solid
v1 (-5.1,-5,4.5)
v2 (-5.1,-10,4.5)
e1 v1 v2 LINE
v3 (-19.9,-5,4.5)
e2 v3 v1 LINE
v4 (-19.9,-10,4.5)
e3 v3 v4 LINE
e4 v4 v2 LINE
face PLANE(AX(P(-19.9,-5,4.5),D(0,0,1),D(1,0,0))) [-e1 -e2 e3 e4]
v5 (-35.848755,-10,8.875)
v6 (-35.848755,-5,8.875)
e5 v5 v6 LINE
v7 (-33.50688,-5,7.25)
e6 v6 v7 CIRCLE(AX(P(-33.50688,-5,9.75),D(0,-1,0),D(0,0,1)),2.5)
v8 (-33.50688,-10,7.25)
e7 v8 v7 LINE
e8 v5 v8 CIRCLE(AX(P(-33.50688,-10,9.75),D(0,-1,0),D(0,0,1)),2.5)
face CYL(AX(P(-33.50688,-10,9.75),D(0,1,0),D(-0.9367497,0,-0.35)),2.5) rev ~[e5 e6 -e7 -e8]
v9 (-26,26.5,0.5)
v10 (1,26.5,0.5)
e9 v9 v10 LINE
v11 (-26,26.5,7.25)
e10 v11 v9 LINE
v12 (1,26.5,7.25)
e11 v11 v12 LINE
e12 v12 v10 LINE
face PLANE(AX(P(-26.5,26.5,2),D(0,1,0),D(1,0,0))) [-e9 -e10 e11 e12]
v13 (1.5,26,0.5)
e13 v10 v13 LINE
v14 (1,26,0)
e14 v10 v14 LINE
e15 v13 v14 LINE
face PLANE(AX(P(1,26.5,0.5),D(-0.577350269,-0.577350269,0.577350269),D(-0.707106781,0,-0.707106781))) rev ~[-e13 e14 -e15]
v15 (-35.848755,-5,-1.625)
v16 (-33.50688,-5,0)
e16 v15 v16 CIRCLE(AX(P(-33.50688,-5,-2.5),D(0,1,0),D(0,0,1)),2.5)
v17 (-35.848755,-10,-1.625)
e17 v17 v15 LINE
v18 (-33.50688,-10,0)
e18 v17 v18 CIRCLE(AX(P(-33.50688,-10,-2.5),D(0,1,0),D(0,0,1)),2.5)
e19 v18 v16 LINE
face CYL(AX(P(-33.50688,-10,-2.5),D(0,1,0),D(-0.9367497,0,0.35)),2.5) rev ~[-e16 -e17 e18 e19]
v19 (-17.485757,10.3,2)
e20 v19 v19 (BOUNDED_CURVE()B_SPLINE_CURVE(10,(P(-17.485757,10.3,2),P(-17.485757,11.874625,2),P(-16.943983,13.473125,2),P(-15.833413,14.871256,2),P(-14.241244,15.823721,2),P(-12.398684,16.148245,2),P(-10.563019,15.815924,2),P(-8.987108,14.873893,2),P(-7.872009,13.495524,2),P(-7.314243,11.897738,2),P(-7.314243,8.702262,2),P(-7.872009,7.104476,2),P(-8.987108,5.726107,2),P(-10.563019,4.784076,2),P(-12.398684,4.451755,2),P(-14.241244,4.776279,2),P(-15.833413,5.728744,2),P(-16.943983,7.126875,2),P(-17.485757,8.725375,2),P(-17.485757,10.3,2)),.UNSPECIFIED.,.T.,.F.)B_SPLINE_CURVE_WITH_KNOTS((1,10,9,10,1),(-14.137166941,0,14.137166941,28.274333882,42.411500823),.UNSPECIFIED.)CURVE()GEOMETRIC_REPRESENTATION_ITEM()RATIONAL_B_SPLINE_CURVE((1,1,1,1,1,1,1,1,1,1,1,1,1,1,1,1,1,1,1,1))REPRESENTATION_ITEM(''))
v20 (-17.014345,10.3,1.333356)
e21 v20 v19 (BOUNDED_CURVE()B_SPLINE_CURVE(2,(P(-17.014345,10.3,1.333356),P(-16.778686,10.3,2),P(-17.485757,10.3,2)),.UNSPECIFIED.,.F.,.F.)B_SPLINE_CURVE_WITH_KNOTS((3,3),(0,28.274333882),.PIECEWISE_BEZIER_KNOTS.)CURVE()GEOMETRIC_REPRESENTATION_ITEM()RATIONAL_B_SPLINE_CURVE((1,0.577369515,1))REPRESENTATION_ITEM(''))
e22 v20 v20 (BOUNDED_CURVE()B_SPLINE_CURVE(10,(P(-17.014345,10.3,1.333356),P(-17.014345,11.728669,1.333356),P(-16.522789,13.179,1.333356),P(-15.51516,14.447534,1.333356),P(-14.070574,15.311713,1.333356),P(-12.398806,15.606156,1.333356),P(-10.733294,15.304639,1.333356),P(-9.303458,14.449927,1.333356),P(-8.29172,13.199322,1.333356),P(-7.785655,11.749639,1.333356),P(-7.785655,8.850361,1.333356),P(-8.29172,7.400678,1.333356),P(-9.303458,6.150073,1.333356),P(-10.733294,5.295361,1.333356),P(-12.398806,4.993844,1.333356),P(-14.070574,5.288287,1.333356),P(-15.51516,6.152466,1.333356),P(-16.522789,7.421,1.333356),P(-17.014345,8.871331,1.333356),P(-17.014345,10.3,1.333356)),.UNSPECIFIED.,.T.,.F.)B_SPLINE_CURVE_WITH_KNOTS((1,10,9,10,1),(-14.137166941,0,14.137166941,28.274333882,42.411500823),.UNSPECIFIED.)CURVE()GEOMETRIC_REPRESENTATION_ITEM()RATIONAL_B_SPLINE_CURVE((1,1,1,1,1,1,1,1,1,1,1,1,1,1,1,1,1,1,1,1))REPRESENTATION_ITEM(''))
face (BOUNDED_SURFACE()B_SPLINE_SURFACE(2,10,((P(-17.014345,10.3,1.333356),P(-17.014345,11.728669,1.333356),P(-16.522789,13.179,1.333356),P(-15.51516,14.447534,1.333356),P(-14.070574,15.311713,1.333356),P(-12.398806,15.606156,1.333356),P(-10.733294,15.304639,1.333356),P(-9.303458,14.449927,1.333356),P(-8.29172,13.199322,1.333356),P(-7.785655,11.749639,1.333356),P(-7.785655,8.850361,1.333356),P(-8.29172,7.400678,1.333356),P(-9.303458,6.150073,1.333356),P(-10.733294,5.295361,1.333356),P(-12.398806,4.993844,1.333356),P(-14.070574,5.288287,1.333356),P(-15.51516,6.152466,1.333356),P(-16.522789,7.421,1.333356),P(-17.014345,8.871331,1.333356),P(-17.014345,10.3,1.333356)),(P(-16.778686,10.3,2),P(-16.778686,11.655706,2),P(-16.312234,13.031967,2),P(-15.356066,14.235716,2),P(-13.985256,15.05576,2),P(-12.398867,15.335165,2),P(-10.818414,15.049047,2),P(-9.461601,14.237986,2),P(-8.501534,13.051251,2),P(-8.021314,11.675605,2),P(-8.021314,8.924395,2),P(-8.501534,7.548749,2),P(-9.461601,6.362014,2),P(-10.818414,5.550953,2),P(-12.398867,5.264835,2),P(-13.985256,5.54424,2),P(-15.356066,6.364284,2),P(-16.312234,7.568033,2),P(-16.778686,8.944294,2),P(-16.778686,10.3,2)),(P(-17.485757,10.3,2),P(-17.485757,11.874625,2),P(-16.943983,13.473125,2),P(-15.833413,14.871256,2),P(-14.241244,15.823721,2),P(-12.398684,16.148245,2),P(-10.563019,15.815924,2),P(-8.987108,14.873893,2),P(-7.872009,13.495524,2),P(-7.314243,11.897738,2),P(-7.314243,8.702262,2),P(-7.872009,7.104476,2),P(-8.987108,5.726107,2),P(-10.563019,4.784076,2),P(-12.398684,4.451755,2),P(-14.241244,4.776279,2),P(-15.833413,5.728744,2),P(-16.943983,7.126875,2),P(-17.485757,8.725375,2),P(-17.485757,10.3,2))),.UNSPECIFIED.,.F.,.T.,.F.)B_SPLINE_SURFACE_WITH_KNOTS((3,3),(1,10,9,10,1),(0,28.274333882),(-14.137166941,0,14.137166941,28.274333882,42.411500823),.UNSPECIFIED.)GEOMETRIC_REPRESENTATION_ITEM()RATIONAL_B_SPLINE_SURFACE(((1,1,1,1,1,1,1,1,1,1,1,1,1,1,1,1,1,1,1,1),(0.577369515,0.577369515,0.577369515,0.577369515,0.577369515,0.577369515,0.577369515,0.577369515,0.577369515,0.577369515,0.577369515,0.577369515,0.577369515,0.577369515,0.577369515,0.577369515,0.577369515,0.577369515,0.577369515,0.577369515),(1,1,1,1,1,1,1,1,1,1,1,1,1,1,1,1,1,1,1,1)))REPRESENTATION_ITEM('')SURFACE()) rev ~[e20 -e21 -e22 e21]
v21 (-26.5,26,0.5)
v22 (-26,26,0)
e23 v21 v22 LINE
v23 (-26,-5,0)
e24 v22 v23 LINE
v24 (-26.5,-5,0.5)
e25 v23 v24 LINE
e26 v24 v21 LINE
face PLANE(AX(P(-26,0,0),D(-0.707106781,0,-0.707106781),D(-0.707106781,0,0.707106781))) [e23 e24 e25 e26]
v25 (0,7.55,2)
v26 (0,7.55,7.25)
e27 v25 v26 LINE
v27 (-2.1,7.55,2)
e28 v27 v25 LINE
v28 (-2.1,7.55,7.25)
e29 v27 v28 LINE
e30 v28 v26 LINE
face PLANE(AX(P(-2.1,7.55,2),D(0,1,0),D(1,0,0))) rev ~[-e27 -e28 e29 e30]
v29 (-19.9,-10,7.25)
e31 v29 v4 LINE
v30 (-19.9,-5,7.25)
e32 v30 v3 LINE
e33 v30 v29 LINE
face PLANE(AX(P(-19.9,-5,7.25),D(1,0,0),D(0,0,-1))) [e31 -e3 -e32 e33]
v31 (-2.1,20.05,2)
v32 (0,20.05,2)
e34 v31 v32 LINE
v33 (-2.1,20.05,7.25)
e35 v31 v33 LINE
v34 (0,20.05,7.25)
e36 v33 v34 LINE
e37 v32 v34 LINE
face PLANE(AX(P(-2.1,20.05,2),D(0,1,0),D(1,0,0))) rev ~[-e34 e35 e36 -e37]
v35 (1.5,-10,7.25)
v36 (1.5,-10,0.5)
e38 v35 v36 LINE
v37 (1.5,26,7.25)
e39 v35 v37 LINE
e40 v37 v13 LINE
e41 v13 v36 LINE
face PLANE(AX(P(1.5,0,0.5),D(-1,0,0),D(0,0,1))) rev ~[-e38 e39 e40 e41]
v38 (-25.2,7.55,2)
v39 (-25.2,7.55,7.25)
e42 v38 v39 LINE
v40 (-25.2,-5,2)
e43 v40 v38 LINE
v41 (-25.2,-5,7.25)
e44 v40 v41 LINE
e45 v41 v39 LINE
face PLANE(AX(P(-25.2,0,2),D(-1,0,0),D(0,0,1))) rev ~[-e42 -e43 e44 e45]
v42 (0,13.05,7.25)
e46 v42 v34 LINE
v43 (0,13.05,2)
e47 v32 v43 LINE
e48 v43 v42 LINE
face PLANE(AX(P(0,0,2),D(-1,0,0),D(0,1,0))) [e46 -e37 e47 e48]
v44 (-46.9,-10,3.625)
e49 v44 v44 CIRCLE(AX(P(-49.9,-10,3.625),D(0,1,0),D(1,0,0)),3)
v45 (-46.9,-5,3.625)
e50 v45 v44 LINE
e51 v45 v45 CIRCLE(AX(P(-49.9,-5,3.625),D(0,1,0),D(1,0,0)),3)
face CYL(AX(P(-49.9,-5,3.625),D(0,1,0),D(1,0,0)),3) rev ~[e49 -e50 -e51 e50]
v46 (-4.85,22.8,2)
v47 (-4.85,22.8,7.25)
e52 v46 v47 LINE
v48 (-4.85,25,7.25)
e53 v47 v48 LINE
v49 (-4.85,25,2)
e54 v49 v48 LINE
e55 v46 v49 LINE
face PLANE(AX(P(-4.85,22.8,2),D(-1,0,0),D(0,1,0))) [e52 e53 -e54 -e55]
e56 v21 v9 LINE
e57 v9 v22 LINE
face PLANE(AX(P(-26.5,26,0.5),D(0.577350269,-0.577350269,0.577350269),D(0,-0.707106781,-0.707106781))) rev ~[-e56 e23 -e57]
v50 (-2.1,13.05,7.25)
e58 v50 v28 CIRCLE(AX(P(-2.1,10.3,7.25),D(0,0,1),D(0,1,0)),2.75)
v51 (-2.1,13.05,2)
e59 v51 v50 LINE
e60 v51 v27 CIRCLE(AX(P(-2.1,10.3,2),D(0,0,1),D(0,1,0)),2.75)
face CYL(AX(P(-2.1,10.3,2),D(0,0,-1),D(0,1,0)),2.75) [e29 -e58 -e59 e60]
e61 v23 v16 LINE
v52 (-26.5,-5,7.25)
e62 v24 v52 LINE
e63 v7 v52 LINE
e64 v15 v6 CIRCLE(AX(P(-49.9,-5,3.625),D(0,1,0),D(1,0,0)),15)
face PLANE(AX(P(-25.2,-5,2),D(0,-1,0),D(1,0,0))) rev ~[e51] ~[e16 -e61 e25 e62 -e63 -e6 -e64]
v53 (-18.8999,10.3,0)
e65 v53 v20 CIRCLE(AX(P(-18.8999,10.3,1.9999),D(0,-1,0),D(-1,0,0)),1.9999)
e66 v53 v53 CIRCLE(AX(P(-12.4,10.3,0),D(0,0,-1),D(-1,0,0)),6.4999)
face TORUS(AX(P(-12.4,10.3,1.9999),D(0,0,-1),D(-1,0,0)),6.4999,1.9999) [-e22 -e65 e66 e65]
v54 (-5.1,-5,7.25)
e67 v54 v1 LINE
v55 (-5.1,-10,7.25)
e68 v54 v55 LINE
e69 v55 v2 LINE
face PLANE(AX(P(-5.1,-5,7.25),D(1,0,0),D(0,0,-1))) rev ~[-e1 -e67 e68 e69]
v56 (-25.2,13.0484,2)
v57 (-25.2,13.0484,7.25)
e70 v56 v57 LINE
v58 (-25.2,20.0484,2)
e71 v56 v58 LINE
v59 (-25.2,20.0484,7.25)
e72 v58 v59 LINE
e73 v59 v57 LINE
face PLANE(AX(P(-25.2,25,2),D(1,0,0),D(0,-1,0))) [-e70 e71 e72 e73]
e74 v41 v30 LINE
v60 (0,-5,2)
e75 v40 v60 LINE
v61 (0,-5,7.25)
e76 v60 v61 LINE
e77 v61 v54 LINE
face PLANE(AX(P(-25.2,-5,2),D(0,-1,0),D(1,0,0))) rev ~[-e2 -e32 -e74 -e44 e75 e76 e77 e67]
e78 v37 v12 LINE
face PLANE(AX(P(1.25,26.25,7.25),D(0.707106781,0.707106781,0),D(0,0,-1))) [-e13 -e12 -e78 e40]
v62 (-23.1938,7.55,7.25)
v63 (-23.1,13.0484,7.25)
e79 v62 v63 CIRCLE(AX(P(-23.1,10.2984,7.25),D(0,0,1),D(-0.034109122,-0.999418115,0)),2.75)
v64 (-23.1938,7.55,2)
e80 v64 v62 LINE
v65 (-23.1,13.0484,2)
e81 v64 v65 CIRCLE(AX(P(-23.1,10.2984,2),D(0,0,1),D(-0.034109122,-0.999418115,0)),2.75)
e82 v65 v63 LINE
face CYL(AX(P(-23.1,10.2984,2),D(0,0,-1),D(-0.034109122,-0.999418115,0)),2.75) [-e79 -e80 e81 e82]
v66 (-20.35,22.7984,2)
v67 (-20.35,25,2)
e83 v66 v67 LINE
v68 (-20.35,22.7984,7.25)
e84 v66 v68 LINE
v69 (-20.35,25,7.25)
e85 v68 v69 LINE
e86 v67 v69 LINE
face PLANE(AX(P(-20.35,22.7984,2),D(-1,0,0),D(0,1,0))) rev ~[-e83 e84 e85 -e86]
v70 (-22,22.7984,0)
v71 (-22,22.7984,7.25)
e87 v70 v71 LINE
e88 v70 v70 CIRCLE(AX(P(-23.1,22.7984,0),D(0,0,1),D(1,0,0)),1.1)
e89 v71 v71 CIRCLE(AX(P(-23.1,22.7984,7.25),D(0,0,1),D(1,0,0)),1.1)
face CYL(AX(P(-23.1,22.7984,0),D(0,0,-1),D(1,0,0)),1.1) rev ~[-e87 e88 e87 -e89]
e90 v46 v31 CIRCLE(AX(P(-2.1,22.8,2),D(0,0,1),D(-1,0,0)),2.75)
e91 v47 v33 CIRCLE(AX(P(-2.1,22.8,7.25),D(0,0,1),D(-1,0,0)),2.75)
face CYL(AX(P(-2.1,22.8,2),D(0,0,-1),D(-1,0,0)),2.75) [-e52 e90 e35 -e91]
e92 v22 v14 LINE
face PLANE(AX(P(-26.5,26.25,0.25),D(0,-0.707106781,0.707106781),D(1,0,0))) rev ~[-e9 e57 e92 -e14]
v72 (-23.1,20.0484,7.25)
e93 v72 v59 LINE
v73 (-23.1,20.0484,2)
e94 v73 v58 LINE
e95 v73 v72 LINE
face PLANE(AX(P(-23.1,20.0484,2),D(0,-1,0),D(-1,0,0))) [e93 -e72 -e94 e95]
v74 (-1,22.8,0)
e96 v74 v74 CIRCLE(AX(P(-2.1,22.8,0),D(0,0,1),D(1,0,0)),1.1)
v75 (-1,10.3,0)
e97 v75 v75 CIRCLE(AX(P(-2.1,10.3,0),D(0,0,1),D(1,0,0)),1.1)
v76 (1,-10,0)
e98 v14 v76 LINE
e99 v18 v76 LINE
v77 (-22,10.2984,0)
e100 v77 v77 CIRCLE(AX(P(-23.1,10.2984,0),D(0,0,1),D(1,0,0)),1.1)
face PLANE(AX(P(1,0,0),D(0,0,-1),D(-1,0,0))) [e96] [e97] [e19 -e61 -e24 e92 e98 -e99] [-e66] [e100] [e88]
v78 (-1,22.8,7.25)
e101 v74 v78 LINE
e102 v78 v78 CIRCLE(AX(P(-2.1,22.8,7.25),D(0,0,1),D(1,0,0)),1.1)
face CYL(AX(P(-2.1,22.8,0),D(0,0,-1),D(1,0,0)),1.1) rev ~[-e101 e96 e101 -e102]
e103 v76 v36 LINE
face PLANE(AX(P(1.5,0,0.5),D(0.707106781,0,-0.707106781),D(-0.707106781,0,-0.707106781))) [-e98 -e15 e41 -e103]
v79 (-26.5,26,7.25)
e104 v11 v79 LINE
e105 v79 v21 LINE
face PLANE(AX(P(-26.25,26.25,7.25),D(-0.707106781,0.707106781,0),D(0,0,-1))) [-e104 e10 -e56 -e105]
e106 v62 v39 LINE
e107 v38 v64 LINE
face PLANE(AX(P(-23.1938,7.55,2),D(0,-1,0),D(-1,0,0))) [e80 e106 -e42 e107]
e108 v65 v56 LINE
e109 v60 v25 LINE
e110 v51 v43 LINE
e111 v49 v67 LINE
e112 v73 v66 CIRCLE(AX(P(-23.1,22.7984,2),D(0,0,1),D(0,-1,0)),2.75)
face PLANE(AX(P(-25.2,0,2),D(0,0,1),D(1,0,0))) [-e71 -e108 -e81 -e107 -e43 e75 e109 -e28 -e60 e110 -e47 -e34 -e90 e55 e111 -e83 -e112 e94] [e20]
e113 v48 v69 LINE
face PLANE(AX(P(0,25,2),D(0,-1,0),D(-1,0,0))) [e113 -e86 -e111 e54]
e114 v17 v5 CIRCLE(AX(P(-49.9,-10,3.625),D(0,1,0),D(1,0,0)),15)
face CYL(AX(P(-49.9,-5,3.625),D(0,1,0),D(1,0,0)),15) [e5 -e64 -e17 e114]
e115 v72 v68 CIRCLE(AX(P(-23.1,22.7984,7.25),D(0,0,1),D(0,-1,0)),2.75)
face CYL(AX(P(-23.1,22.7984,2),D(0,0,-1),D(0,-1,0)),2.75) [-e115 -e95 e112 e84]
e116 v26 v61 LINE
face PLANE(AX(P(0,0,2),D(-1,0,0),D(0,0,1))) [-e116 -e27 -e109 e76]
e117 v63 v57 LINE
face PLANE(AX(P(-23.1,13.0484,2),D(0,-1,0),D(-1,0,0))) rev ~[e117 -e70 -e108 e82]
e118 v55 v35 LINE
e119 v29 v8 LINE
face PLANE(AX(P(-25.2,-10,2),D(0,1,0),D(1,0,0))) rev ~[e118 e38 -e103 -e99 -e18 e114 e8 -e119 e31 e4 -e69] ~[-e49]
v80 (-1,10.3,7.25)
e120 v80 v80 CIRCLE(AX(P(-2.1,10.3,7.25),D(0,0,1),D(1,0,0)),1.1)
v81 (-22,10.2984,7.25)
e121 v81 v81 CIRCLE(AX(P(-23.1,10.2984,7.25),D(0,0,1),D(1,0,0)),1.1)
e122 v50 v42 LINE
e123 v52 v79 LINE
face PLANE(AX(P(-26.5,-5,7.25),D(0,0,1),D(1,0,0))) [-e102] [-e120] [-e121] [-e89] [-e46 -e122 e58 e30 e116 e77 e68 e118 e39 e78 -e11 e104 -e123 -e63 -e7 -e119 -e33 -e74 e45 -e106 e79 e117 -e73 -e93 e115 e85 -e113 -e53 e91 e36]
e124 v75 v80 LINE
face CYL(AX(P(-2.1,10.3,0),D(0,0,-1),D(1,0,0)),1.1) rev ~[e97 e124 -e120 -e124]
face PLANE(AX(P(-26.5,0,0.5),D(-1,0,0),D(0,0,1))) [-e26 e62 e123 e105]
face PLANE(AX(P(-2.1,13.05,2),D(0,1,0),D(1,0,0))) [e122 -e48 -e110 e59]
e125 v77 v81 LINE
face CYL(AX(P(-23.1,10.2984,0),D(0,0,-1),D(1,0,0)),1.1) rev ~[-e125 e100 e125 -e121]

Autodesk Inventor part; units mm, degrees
ref_plane "YZ Plane" through (0, 0, 0) normal (1, 0, 0) x (0, 1, 0)
ref_plane "XZ Plane" through (0, 0, 0) normal (0, 1, 0) x (-1, 0, 0)
ref_plane "XY Plane" through (0, 0, 0) normal (0, 0, 1) x (1, 0, 0)
sketch "Sketch1" plane through (0, 0, 0) normal (0, 0, 1) x (1, 0, 0)
  line L0 (0, 0) -> (-25, 0)
  line L1 (-25, 25) -> (0, 25)
  line L2 (0, 25) -> (0, 0)
  circle A0 centre (-23.1, 22.7984) radius 1.1
  circle A1 centre (-2.1, 22.8) radius 1.1
  circle A2 centre (-23.1, 10.2984) radius 1.1
  circle A3 centre (-2.1, 10.3) radius 1.1
  line L3 (-25, 0) -> (-25.2, 0)
  line L4 (-25.2, 0) -> (-25.2, 25)
  line L5 (-25.2, 25) -> (-25, 25)
  dimension "d2" = 2.2
  dimension "d5" = 2.2
  dimension "d7" = 12.5
  dimension "d8" = 2.2
  dimension "d9" = 2.2
  dimension "d14" = 12.5
  dimension "d31" = 2.1
  dimension "d46" = 0.2
  dimension "d47" = 2.1
  dimension "d48" = 2.1
extrude "Base" add sketch "Sketch1" along normal blind 2
sketch "Sketch2" plane through (0, 0, 2) normal (0, 0, 1) x (1, 0, 0)
  line L0 (-26.5, 0) -> (-26.5, 26.5)
  line L1 (-26.5, 26.5) -> (1.5, 26.5)
  line L2 (1.5, 26.5) -> (1.5, 0)
  line L3 (1.5, 0) -> (0, 0)
  line L4 (0, 25) -> (-25.2, 25) projected
  line L5 (0, 0) -> (0, 25) projected
  line L6 (-25.2, 25) -> (-25.2, 0) projected
  line L7 (-25.2, 0) -> (-26.5, 0)
  point P0 (-25, 25)
  point P1 (-25, 0)
  dimension "d16" = 26.5
  dimension "d17" = 28
extrude "Walls" add sketch "Sketch2" along normal blind 5.25 and the other way blind 2
sketch "Sketch3" plane through (0, 0, 2) normal (0, 0, 1) x (1, 0, 0)
  circle A0 centre (-23.1, 10.2984) radius 1.1 projected
  circle A1 centre (-23.1, 10.2984) radius 1.6
  circle A2 centre (-2.1, 10.3) radius 1.1 projected
  circle A3 centre (-2.1, 10.3) radius 1.6
  circle A4 centre (-23.1, 22.7984) radius 1.1 projected
  circle A5 centre (-23.1, 22.7984) radius 1.6
  circle A6 centre (-2.1, 22.8) radius 1.1 projected
  circle A7 centre (-2.1, 22.8) radius 1.6
  point P0 (0, 0)
  dimension "d22" = 3.2
  dimension "d23" = 3.2
  dimension "d24" = 3.2
  dimension "d25" = 3.2
extrude "Spacers" add sketch "Sketch3" along normal up to surface (5.25 mm away)
sketch "Sketch4" plane through (0, 0, 2) normal (0, 0, 1) x (1, 0, 0)
  circle A0 centre (-23.1, 10.2984) radius 1.1 projected
  arc A1 (-23.1938, 7.55) -> (-23.1, 13.0484) centre (-23.1, 10.2984) ccw
  circle A2 centre (-2.1, 10.3) radius 1.1 projected
  arc A3 (-2.1, 13.05) -> (-2.1, 7.55) centre (-2.1, 10.3) ccw
  circle A4 centre (-23.1, 22.7984) radius 1.1 projected
  circle A5 centre (-2.1, 22.8) radius 1.1 projected
  line L0 (-4.85, 22.8) -> (-4.85, 25)
  line L1 (-25.2, 25) -> (0, 25) projected
  line L2 (-2.1, 20.05) -> (0, 20.05)
  line L3 (0, 25) -> (0, 0) projected
  line L4 (-2.1, 13.05) -> (0, 13.05)
  line L5 (-2.1, 7.55) -> (0, 7.55)
  line L6 (-23.1, 13.0484) -> (-25.2, 13.0484)
  line L7 (-23.1938, 7.55) -> (-25, 7.55)
  arc A6 (-4.85, 22.8) -> (-2.1, 20.05) centre (-2.1, 22.8) ccw
  line L8 (-25, 7.55) -> (-25.2, 7.55)
  line L9 (-25.2, 13.0484) -> (-25.2, 13.0484)
  line L10 (-25.2, 25) -> (-25.2, 0) projected
  line L11 (-25.2, 20.0484) -> (-25.2, 20.0484)
  line L12 (-20.35, 22.7984) -> (-20.35, 25.6874)
  line L13 (-23.1, 20.0484) -> (-25.85, 20.0484)
  arc A7 (-23.1, 20.0484) -> (-20.35, 22.7984) centre (-23.1, 22.7984) ccw
  point P0 (-25, 25)
  point P1 (-20.35, 25)
  point P2 (-25.2, 20.0484)
  dimension "d33" = 5.5
  dimension "d34" = 5.5
extrude "Spacer blocks" add sketch "Sketch4" along normal up to surface (5.25 mm away)
sketch "Sketch5" plane through (0, 0, 0) normal (0, 0, -1) x (-1, 0, 0)
  line L0 (-1.5, 26.5) -> (-1.5, 0) projected
  circle A0 centre (12.4, 10.3) radius 4.5
  point P0 (0, 0)
  dimension "d39" = 13.9
  dimension "d40" = 9
extrude "Camera Hole" cut sketch "Sketch5" against normal through all
fillet "Outside Fillet - 2mm" radius 2 1 edges at (-7.9, 10.3, 0)
fillet "Inside Fillet - 1mm" radius 0.5 2 edges at (-7.9, 10.3, 1.9999) (-7.9, 10.3, 2)
chamfer "Chamfer1" distance 0.5 angle 45 5 edges at (1.5, 13.25, 0) (1.5, 26.5, 3.625) (-12.5, 26.5, 0) (-26.5, 26.5, 3.625) (-26.5, 13.25, 0)
sketch "Sketch6" plane through (-25.2, 0, 2) normal (0, -1, 0) x (1, 0, 0)
  line L0 (-0.8, -2) -> (-1.3, -1.5) projected
  line L1 (26.2, -2) -> (-0.8, -2) projected
  line L2 (26.7, -1.5) -> (26.2, -2) projected
  line L3 (26.7, -1.5) -> (26.7, 5.25) projected
  line L4 (25.2, 5.25) -> (26.7, 5.25) projected
  line L5 (25.2, 0) -> (25.2, 5.25) projected
  line L6 (0, 0) -> (25.2, 0) projected
  line L7 (0, 0) -> (0, 5.25) projected
  line L8 (-1.3, 5.25) -> (0, 5.25) projected
  line L9 (-1.3, -1.5) -> (-1.3, 5.25) projected
  point P0 (25.2, -2)
extrude "Bottom Extension" add sketch "Sketch6" along normal blind 5
sketch "Sketch7" plane through (-25.2, -5, 2) normal (0, -1, 0) x (1, 0, 0)
  line L0 (26.7, 5.25) -> (25.2, 5.25) projected
  line L1 (26.7, 5.25) -> (20.1, 5.25)
  line L2 (20.1, 5.25) -> (20.1, -2)
  line L3 (26.7, 5.25) -> (25.2, 5.25) construction
  line L4 (25.2, 5.25) -> (25.2, 0) construction
  line L5 (25.2, 0) -> (0, 0) construction
  line L6 (0, 0) -> (0, 5.25) construction
  line L7 (0, 5.25) -> (-1.3, 5.25) construction
  line L8 (-1.3, 5.25) -> (-1.3, -1.5) construction
  line L9 (-1.3, -1.5) -> (-0.8, -2) construction
  line L10 (-0.8, -2) -> (26.2, -2) construction
  line L11 (26.2, -2) -> (26.7, -1.5) construction
  line L12 (26.7, -1.5) -> (26.7, 5.25) construction
  line L13 (20.1, -2) -> (-0.8, -2)
  line L14 (-1.3, -1.5) -> (-0.8, -2)
  line L15 (-1.3, -1.5) -> (-1.3, 5.25)
  line L16 (-1.3, 5.25) -> (0, 5.25)
  line L17 (0, 5.25) -> (5.3, 5.25)
  line L18 (5.3, 5.25) -> (5.3, 0)
  line L19 (5.3, 0) -> (20.1, 0)
  line L20 (5.3, 0) -> (5.3, 2.5)
  line L21 (5.3, 2.5) -> (20.1, 2.5)
  line L22 (26.7, 5.25) -> (26.7, -1.5)
  line L23 (26.2, -2) -> (26.7, -1.5)
  line L24 (20.1, -2) -> (26.2, -2)
  line L25 (5.3, 5.25) -> (-24.7, 5.25)
  line L26 (-24.7, 5.25) -> (-24.7, -2)
  line L27 (-24.7, -2) -> (-0.8, -2)
  point P0 (25.2, -2)
  point P1 (50.1, 5.25)
  dimension "d54" = 6.6
  dimension "d58" = 5.3
  dimension "d59" = 2.5
  dimension "d68" = 30
extrude "Mounting Arm" add sketch "Sketch7" along normal blind 5
sketch "Sketch10" plane through (-25.2, -5, 2) normal (0, 1, 0) x (1, 0, 0)
  line L0 (-24.7, -5.25) -> (-24.7, 2) projected
  circle A0 centre (-24.7, -1.625) radius 15
  point P0 (25.2, 2)
  dimension "d69" = 30
extrude "Extrusion10" add sketch "Sketch10" against normal blind 5
sketch "Sketch11" plane through (-25.2, -5, 2) normal (0, 1, 0) x (1, 0, 0)
  arc A0 (-10.1446, 2) -> (-10.1446, -5.25) centre (-24.7, -1.625) ccw projected
  circle A1 centre (-24.7, -1.625) radius 3
  point P0 (25.2, 2)
  dimension "d72" = 6
extrude "Extrusion11" cut sketch "Sketch11" against normal through all
fillet "Fillet6" radius 2.5 2 edges at (-35.3446, -7.5, 7.25) (-35.3446, -7.5, 0)
properties part number "Top R_3DPrint"
